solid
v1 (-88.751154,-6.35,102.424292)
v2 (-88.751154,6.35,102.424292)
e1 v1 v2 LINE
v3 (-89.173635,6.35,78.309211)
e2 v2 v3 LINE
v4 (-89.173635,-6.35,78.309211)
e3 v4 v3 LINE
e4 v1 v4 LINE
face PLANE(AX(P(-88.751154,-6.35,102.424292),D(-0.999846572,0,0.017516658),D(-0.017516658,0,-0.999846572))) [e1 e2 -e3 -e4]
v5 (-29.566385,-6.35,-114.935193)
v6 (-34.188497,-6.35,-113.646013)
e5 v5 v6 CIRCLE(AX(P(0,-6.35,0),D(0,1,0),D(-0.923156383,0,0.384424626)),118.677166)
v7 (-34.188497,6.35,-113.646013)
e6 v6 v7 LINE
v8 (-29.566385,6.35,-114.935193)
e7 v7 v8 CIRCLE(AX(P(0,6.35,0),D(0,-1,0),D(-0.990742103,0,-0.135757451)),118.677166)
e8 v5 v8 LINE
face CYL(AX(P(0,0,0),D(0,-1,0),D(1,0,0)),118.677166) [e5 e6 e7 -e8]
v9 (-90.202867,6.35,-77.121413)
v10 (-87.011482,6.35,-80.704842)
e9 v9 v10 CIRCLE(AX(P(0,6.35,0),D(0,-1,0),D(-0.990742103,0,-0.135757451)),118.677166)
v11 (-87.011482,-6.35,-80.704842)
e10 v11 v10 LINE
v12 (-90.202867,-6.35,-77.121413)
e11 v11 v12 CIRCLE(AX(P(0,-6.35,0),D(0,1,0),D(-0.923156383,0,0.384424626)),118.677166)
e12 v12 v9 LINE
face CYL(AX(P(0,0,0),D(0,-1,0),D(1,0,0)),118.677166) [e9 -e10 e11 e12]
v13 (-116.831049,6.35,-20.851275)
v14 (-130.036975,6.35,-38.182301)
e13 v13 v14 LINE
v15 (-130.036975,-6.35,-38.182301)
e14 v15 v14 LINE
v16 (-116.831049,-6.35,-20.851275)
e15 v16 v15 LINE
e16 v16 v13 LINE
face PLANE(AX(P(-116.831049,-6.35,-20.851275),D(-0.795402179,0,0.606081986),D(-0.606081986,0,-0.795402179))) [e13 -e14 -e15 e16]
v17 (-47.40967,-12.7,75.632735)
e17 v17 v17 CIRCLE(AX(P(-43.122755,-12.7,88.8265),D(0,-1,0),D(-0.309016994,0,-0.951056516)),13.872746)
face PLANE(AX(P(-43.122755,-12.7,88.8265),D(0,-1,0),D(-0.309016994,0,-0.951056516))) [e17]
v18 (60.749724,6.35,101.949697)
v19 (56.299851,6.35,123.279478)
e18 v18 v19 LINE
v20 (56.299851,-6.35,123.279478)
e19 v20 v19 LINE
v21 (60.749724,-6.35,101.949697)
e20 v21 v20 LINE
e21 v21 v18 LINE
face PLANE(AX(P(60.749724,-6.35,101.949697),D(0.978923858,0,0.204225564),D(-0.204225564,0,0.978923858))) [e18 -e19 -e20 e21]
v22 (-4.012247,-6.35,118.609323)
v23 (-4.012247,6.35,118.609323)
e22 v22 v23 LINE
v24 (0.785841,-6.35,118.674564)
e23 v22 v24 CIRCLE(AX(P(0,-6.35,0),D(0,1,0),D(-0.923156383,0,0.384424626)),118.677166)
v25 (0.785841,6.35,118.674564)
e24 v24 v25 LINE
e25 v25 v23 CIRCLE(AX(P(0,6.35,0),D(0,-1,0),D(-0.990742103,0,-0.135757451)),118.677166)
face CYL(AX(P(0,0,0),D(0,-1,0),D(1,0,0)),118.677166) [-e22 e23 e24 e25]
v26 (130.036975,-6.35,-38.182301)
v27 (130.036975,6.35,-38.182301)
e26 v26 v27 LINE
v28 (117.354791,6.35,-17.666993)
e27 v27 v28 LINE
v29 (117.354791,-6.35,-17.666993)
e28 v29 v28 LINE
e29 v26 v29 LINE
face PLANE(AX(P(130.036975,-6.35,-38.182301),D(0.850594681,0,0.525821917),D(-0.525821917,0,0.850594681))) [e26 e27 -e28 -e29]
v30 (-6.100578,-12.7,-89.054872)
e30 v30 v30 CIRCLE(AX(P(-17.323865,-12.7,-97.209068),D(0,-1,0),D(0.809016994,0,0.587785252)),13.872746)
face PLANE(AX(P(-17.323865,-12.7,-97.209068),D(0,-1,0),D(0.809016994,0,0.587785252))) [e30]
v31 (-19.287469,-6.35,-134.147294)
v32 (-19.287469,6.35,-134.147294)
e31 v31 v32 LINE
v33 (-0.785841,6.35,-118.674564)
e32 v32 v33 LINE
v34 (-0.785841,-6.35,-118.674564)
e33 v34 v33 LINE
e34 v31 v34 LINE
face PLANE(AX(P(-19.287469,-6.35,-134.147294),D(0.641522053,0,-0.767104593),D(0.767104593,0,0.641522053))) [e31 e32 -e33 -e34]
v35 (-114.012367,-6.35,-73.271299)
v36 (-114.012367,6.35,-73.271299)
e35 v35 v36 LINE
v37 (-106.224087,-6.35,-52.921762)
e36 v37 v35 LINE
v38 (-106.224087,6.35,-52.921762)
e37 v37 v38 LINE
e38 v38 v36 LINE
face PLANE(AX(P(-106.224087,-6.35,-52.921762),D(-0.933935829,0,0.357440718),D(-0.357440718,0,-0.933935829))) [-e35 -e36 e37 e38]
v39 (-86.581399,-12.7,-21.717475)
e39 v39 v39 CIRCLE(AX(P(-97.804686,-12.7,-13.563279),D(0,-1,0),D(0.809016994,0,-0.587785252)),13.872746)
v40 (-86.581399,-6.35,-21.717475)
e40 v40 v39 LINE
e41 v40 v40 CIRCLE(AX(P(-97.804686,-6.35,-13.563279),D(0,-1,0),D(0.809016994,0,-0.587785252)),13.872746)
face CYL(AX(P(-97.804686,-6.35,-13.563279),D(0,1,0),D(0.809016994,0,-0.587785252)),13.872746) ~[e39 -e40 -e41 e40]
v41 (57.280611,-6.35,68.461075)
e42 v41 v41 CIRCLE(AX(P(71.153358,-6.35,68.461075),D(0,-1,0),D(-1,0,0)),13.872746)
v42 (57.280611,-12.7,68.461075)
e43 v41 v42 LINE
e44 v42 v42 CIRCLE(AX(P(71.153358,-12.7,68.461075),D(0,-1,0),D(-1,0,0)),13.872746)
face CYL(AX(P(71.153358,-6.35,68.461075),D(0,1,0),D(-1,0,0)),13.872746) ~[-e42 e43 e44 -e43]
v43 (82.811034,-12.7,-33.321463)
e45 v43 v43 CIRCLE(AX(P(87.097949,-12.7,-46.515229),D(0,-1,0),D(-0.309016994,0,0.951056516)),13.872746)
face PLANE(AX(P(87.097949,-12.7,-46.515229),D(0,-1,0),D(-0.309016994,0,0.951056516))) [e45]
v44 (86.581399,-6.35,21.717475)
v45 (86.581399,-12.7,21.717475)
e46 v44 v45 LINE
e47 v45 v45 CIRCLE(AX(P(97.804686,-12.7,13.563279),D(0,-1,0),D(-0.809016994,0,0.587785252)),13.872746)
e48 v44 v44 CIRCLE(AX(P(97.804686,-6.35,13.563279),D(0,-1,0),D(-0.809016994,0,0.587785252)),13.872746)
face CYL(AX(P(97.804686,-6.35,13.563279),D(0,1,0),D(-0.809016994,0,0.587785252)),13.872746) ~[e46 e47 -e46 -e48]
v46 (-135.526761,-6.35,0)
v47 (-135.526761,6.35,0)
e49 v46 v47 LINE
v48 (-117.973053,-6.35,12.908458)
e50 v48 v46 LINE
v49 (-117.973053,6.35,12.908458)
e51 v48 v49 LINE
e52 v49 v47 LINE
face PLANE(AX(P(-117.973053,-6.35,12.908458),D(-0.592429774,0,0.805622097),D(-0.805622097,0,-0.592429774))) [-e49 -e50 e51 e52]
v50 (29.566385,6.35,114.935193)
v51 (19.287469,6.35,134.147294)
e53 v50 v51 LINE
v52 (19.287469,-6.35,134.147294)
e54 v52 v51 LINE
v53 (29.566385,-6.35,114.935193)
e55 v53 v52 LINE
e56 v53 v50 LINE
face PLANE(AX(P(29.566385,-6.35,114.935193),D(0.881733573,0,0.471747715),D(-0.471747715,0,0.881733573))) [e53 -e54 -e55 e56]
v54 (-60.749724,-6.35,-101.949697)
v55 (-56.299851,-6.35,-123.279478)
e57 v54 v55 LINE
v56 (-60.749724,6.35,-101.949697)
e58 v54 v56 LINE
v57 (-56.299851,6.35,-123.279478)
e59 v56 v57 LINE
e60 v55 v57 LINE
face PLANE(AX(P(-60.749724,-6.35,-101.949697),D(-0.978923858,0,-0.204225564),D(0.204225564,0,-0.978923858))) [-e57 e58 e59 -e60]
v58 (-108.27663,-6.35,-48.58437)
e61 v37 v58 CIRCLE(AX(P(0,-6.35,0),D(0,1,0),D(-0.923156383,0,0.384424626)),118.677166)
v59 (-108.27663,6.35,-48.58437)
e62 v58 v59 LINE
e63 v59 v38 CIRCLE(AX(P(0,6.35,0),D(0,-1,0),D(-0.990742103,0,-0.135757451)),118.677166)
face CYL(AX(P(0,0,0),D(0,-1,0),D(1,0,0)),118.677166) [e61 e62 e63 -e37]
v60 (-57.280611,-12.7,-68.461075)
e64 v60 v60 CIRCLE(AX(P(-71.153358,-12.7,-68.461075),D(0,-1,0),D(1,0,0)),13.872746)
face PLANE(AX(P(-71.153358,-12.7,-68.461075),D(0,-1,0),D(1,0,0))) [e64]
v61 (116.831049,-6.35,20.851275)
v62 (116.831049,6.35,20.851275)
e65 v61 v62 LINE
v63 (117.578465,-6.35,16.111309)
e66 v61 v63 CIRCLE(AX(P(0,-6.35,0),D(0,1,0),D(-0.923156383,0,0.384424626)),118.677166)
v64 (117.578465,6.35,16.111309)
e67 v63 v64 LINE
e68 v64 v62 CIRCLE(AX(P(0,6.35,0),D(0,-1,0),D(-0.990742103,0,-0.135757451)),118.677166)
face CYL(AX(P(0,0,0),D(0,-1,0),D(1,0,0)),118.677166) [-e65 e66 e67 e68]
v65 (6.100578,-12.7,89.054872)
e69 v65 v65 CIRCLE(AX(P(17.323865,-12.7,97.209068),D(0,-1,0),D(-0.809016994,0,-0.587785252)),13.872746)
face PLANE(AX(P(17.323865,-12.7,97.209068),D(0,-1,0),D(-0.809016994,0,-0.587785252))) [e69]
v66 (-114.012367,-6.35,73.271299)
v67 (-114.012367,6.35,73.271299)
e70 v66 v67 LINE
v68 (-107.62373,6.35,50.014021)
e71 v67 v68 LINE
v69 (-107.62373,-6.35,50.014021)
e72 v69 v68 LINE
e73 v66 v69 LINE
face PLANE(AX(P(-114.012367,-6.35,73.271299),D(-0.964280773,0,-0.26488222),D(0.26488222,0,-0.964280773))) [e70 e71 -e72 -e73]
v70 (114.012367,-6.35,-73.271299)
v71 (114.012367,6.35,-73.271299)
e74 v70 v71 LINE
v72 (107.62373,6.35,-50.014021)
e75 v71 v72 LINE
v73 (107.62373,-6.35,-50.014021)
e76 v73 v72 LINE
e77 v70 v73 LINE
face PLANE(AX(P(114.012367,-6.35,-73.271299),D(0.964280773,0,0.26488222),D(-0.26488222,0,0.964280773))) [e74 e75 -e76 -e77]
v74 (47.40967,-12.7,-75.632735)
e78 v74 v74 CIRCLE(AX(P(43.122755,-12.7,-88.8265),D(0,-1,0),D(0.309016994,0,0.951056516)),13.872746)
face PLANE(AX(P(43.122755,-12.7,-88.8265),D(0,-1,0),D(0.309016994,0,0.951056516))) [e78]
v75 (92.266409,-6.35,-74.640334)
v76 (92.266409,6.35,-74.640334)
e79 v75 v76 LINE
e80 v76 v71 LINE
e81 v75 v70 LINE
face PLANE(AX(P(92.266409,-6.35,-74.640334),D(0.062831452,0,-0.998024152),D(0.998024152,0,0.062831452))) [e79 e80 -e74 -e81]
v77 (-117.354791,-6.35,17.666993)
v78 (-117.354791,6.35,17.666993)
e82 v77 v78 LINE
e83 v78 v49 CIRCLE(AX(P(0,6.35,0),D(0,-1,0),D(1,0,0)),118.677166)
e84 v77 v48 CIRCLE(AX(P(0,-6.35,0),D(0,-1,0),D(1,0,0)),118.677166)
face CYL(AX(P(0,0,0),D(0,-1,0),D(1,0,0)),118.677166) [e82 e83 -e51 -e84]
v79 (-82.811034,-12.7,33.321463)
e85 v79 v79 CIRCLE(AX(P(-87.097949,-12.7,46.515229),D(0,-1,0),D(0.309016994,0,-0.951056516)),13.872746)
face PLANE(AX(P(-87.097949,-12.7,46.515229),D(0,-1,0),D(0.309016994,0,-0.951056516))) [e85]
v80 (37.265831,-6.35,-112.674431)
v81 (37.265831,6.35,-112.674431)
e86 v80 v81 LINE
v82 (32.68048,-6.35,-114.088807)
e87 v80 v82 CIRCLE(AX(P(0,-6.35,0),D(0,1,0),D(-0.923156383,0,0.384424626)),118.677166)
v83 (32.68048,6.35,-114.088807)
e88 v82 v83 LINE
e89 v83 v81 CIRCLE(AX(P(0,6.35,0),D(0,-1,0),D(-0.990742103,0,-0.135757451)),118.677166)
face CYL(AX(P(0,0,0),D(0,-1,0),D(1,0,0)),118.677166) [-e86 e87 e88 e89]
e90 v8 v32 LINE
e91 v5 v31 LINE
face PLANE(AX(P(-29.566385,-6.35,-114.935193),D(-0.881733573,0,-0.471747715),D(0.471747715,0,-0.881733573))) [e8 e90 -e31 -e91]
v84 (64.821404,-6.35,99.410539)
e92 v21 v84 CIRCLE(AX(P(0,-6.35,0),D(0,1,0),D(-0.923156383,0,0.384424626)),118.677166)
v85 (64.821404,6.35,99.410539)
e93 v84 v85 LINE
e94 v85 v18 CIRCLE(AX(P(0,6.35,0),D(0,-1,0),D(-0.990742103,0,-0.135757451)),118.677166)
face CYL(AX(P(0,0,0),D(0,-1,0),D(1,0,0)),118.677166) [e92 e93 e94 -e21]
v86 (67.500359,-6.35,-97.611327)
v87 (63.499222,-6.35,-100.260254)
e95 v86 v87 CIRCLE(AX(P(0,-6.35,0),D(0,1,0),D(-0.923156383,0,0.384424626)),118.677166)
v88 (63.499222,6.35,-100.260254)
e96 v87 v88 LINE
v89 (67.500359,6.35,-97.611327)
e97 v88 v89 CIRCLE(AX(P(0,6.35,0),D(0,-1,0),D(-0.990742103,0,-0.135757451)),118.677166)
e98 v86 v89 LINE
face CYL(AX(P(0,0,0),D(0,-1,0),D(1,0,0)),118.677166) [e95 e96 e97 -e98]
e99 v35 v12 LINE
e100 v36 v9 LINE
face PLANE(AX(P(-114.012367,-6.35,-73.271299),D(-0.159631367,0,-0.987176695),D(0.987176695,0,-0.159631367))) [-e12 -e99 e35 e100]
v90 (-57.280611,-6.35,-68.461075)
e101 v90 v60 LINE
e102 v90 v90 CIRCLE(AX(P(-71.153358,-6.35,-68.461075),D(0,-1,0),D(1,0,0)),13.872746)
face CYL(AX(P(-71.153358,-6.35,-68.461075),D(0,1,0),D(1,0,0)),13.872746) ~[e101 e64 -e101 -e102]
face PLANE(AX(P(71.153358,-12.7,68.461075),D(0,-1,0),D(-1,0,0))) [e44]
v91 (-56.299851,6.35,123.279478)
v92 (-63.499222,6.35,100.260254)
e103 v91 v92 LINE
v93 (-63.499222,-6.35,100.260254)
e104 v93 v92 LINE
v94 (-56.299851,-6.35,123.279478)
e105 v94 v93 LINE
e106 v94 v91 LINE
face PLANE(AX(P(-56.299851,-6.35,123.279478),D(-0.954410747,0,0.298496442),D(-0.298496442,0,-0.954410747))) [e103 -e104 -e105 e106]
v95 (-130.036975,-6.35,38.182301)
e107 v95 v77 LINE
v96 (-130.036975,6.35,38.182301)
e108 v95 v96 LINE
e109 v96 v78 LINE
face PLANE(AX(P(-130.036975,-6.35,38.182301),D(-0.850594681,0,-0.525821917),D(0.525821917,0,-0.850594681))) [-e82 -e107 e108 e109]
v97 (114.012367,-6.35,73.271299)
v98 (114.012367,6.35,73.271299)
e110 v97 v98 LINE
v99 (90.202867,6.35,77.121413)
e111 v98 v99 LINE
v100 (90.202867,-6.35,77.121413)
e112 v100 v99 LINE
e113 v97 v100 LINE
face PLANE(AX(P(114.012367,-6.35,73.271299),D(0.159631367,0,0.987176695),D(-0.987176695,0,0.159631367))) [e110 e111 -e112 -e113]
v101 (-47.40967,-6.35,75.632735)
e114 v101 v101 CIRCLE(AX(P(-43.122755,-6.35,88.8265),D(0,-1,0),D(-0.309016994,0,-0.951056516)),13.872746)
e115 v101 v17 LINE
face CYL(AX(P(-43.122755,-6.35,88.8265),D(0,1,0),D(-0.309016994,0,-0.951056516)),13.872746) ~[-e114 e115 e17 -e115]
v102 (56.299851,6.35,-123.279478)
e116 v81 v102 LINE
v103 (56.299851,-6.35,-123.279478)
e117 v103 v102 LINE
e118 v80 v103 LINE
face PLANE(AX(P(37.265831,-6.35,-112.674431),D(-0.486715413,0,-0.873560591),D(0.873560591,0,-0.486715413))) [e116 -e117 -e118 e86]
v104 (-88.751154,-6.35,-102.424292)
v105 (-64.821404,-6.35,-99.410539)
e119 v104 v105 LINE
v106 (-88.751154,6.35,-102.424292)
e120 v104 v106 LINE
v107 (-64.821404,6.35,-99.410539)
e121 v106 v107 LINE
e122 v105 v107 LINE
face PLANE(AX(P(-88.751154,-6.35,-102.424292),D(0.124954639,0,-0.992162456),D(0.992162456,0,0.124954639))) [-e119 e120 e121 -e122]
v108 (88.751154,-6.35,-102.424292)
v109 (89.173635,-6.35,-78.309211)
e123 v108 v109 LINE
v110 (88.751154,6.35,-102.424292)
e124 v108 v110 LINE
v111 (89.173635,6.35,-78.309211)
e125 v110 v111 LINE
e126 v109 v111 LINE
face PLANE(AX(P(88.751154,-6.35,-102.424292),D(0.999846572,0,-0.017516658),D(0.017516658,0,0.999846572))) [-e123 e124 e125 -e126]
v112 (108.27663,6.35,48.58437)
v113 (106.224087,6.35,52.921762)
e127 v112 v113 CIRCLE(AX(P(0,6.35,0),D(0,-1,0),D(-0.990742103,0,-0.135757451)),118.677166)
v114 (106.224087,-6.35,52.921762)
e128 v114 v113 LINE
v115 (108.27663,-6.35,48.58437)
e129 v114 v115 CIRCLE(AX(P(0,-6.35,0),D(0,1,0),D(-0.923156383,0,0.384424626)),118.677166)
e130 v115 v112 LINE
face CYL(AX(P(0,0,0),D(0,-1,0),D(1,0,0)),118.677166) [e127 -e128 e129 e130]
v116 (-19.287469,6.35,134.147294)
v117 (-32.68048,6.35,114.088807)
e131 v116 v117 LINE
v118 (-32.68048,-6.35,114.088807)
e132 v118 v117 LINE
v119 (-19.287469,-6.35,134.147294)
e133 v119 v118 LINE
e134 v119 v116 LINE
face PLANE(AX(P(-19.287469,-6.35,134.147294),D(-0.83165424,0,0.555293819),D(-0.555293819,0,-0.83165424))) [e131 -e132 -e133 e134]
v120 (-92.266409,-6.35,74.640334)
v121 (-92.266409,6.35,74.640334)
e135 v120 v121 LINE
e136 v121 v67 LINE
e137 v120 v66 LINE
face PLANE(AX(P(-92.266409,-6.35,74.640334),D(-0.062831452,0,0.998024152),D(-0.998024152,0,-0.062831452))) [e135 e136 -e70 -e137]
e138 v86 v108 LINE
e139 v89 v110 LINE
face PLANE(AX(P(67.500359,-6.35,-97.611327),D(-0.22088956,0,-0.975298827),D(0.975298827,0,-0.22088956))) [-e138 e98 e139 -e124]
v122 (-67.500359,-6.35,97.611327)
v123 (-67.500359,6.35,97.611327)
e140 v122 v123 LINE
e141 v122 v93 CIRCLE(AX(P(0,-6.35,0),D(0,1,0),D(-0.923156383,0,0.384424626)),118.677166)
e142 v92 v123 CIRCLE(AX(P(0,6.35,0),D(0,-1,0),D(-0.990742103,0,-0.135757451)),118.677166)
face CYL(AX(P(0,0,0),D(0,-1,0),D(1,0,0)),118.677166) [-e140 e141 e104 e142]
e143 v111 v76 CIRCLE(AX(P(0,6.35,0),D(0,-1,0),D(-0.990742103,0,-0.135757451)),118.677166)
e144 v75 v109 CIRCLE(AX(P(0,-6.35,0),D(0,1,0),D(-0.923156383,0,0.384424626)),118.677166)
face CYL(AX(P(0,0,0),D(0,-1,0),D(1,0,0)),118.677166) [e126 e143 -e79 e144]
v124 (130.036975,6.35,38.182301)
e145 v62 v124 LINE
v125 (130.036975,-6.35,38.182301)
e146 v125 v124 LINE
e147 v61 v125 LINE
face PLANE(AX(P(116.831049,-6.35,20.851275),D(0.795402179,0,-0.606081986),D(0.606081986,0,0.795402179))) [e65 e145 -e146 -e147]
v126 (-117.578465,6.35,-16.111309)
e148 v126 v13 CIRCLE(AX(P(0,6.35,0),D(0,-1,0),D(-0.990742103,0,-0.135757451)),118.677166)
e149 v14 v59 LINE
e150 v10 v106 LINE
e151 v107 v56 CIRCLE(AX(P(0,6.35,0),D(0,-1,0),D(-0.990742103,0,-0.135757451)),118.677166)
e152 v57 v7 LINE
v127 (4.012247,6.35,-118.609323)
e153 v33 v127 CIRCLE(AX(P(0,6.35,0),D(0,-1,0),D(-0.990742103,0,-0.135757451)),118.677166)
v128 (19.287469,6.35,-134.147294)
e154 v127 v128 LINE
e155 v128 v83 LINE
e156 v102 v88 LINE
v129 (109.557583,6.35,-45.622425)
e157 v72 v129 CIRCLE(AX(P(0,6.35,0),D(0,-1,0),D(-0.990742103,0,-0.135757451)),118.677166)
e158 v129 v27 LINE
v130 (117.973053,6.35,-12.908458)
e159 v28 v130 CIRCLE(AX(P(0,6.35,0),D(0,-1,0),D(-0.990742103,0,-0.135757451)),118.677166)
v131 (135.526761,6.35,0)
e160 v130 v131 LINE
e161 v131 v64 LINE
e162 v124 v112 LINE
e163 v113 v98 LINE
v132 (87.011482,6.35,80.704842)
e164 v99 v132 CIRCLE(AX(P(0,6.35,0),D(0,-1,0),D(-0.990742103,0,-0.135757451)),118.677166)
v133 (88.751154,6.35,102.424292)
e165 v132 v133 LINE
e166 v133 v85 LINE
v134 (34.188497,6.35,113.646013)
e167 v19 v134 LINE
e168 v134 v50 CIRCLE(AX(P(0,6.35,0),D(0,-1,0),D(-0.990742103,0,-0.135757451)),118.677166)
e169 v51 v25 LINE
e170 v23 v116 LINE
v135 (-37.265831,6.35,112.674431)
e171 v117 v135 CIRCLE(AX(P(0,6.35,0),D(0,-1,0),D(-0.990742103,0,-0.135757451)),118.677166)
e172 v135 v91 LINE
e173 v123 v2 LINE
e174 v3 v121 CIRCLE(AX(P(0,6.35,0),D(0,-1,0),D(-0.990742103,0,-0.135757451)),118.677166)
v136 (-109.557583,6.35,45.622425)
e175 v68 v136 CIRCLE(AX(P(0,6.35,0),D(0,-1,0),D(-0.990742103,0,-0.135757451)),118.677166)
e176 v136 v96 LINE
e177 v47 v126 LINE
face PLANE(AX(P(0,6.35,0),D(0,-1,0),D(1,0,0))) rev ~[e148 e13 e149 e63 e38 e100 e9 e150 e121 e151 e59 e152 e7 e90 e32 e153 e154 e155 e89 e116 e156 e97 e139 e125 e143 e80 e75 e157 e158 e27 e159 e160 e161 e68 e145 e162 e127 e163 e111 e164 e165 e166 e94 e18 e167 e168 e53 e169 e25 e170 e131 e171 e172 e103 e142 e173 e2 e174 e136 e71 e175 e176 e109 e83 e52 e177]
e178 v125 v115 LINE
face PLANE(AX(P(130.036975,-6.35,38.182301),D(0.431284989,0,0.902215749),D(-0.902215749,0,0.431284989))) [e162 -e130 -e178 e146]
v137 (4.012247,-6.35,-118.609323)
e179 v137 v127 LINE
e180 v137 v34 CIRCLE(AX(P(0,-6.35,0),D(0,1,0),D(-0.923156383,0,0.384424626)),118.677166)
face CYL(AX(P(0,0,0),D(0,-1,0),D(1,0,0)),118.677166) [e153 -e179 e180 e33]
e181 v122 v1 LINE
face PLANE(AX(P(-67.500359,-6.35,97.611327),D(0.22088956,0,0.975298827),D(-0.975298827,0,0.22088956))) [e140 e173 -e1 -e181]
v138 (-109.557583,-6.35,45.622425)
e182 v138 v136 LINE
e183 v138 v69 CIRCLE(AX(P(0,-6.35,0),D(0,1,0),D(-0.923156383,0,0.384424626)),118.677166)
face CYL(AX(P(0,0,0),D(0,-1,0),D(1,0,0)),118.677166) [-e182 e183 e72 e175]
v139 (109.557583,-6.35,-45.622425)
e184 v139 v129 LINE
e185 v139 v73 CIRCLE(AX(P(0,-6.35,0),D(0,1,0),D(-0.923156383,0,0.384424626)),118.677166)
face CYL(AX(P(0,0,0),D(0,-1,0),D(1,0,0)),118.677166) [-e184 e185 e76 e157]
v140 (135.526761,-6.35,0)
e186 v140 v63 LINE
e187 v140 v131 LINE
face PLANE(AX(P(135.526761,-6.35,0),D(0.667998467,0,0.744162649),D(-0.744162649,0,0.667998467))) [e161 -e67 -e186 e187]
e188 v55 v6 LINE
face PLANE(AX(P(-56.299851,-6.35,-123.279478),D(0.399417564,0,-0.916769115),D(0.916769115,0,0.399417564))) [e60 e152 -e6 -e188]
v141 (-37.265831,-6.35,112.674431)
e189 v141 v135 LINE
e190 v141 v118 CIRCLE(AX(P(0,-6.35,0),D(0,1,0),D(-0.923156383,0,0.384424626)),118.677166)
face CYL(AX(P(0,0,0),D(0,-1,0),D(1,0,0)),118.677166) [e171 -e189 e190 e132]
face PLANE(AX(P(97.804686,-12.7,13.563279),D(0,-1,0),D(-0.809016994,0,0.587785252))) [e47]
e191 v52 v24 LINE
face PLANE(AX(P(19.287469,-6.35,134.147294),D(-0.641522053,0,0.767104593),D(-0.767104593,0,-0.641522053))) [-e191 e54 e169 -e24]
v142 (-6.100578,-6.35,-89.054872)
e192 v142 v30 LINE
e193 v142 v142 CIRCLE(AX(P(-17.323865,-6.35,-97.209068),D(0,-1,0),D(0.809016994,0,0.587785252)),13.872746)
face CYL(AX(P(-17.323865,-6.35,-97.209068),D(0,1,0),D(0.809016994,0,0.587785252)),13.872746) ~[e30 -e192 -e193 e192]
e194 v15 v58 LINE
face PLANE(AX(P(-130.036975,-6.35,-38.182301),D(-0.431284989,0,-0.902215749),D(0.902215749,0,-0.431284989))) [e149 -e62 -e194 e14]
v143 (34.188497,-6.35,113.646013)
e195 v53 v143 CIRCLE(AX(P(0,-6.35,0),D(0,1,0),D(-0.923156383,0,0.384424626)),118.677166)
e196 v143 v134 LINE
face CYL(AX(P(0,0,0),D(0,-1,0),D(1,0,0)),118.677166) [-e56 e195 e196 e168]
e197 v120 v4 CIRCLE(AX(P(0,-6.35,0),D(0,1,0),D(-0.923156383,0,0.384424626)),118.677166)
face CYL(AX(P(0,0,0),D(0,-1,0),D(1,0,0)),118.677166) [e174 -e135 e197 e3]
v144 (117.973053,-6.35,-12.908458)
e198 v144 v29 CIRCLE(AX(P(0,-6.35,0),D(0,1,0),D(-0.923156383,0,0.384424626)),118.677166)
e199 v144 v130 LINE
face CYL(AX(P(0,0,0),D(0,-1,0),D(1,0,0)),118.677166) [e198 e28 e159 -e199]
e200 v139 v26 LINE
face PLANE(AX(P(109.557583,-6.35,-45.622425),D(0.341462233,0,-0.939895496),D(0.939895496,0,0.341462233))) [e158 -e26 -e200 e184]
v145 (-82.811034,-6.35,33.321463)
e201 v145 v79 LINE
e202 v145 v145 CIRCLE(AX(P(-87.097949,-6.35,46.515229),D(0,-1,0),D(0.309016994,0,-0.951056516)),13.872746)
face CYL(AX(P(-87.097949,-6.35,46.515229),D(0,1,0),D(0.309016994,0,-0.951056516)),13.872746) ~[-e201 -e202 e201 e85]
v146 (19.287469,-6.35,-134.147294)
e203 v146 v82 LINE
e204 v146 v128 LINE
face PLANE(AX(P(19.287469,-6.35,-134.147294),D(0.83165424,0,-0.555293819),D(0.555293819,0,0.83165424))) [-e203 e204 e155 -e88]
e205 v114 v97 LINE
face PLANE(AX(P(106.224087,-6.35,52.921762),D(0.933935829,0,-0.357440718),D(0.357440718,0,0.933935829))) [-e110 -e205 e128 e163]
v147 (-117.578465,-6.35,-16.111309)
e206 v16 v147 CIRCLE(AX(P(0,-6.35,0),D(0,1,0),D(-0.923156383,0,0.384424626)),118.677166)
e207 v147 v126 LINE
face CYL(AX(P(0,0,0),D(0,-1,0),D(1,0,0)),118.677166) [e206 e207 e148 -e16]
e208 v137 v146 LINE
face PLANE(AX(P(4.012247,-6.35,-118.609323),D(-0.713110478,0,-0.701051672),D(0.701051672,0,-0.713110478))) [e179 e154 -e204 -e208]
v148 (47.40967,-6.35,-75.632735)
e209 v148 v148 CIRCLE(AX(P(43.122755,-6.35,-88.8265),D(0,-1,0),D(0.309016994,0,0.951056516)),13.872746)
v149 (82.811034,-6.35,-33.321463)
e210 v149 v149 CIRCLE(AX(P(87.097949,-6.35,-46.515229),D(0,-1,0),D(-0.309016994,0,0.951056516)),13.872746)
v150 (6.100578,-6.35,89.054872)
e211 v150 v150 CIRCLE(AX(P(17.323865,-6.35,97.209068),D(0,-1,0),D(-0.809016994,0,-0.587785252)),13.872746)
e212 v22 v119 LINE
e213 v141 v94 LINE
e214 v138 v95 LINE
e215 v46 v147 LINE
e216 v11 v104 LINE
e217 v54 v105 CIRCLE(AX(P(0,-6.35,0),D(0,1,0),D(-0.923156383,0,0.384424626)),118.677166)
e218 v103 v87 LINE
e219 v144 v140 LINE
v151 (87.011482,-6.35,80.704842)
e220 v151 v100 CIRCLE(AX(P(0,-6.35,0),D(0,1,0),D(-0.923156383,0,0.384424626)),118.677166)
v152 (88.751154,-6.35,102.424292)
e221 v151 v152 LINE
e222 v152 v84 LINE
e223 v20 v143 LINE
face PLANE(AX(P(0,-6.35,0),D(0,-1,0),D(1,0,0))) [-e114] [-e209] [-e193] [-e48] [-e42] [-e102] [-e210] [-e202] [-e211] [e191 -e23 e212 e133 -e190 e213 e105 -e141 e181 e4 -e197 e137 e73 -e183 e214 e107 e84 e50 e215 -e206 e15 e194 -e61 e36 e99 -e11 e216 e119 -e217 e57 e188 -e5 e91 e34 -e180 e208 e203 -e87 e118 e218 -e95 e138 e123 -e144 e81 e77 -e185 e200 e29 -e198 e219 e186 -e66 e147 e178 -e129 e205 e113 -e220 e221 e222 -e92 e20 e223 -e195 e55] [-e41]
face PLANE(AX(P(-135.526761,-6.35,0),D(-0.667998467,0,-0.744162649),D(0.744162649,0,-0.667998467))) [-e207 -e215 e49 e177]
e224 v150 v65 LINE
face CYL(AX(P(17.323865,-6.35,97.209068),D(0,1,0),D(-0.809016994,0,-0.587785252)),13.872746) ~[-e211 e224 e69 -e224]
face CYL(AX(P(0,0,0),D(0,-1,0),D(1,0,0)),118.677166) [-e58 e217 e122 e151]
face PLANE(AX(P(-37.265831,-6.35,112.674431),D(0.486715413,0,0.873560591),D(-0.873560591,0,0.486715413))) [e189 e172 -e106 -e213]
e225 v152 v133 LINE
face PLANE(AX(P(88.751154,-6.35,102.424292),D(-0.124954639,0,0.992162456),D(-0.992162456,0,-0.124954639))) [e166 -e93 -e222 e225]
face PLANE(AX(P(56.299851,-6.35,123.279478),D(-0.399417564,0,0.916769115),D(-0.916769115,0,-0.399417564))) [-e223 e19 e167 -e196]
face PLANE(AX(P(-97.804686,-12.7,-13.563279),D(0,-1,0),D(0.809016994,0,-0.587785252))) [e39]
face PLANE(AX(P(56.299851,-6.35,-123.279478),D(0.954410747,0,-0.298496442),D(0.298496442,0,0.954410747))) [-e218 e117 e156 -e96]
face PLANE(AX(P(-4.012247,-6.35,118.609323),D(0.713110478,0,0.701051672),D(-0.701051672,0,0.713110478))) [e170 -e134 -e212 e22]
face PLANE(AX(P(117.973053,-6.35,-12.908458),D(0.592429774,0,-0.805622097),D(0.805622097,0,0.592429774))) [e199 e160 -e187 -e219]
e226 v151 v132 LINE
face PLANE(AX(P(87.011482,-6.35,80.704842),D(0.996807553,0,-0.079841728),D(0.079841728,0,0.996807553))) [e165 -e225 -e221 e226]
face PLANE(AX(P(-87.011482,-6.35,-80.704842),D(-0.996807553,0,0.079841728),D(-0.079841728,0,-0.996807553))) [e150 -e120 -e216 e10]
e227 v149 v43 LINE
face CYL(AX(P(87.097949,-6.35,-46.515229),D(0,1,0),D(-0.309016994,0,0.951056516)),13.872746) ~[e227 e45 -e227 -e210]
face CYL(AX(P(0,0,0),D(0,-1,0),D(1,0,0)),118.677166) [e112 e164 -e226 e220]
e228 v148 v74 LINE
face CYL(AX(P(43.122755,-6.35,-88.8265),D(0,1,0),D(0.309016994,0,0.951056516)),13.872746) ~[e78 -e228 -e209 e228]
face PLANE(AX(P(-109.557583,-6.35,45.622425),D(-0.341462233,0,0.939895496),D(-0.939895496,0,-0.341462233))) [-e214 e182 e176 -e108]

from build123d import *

# Parameters (mm, degrees)
F0_R            = 118.6771656213
F1_DEPTH        = 6.35
F2_R            = 13.8727461935
F3_DEPTH        = 6.35
F3_COPIES_COUNT = 10
F5_DEPTH        = 12.7
F5_COPIES_COUNT = 22


# Not quite as in the source:
# - a pattern or mirror of a feature is missing from the dataset's text; its kind, count and spacing are read off the source's solid


with BuildPart() as f1:
    # F0 (on Front) → F1 (new body, symmetric)
    with BuildSketch(Plane.XZ):
        Circle(F0_R)
    extrude(amount=F1_DEPTH, both=True)

    # F2 (on face) → F3 (join)
    with BuildSketch(Plane.XZ.offset(6.35)):
        with Locations((-71.153357625, -68.4610754251)):
            Circle(F2_R)
    f3 = extrude(amount=F3_DEPTH)

    # F3_copies: F3 ×10 about axis
    f3_copies_axis = Axis((0, 0, 0), (0, 1, 0))
    for i in range(1, F3_COPIES_COUNT):
        add(f3.rotate(f3_copies_axis, i * 360 / F3_COPIES_COUNT))

    # F4 (on face) → F5 (join, through all)
    with BuildSketch(Plane.XZ.offset(6.35)):
        with BuildLine():
            Line((-135.5267614126, 0), (-117.5784646417, -16.1113094564))
            ThreePointArc((-117.5784646417, -16.1113094564), (-118.6661963279, -1.6135330732), (-117.9730534673, 12.9084582934))
            Line((-117.9730534673, 12.9084582934), (-135.5267614126, 0))
        make_face()
    f5 = extrude(amount=-F5_DEPTH)

    # F5_copies: F5 ×22 about axis
    f5_copies_axis = Axis((0, 0, 0), (0, 1, 0))
    for i in range(1, F5_COPIES_COUNT):
        add(f5.rotate(f5_copies_axis, i * 360 / F5_COPIES_COUNT))


solid = f1.part
